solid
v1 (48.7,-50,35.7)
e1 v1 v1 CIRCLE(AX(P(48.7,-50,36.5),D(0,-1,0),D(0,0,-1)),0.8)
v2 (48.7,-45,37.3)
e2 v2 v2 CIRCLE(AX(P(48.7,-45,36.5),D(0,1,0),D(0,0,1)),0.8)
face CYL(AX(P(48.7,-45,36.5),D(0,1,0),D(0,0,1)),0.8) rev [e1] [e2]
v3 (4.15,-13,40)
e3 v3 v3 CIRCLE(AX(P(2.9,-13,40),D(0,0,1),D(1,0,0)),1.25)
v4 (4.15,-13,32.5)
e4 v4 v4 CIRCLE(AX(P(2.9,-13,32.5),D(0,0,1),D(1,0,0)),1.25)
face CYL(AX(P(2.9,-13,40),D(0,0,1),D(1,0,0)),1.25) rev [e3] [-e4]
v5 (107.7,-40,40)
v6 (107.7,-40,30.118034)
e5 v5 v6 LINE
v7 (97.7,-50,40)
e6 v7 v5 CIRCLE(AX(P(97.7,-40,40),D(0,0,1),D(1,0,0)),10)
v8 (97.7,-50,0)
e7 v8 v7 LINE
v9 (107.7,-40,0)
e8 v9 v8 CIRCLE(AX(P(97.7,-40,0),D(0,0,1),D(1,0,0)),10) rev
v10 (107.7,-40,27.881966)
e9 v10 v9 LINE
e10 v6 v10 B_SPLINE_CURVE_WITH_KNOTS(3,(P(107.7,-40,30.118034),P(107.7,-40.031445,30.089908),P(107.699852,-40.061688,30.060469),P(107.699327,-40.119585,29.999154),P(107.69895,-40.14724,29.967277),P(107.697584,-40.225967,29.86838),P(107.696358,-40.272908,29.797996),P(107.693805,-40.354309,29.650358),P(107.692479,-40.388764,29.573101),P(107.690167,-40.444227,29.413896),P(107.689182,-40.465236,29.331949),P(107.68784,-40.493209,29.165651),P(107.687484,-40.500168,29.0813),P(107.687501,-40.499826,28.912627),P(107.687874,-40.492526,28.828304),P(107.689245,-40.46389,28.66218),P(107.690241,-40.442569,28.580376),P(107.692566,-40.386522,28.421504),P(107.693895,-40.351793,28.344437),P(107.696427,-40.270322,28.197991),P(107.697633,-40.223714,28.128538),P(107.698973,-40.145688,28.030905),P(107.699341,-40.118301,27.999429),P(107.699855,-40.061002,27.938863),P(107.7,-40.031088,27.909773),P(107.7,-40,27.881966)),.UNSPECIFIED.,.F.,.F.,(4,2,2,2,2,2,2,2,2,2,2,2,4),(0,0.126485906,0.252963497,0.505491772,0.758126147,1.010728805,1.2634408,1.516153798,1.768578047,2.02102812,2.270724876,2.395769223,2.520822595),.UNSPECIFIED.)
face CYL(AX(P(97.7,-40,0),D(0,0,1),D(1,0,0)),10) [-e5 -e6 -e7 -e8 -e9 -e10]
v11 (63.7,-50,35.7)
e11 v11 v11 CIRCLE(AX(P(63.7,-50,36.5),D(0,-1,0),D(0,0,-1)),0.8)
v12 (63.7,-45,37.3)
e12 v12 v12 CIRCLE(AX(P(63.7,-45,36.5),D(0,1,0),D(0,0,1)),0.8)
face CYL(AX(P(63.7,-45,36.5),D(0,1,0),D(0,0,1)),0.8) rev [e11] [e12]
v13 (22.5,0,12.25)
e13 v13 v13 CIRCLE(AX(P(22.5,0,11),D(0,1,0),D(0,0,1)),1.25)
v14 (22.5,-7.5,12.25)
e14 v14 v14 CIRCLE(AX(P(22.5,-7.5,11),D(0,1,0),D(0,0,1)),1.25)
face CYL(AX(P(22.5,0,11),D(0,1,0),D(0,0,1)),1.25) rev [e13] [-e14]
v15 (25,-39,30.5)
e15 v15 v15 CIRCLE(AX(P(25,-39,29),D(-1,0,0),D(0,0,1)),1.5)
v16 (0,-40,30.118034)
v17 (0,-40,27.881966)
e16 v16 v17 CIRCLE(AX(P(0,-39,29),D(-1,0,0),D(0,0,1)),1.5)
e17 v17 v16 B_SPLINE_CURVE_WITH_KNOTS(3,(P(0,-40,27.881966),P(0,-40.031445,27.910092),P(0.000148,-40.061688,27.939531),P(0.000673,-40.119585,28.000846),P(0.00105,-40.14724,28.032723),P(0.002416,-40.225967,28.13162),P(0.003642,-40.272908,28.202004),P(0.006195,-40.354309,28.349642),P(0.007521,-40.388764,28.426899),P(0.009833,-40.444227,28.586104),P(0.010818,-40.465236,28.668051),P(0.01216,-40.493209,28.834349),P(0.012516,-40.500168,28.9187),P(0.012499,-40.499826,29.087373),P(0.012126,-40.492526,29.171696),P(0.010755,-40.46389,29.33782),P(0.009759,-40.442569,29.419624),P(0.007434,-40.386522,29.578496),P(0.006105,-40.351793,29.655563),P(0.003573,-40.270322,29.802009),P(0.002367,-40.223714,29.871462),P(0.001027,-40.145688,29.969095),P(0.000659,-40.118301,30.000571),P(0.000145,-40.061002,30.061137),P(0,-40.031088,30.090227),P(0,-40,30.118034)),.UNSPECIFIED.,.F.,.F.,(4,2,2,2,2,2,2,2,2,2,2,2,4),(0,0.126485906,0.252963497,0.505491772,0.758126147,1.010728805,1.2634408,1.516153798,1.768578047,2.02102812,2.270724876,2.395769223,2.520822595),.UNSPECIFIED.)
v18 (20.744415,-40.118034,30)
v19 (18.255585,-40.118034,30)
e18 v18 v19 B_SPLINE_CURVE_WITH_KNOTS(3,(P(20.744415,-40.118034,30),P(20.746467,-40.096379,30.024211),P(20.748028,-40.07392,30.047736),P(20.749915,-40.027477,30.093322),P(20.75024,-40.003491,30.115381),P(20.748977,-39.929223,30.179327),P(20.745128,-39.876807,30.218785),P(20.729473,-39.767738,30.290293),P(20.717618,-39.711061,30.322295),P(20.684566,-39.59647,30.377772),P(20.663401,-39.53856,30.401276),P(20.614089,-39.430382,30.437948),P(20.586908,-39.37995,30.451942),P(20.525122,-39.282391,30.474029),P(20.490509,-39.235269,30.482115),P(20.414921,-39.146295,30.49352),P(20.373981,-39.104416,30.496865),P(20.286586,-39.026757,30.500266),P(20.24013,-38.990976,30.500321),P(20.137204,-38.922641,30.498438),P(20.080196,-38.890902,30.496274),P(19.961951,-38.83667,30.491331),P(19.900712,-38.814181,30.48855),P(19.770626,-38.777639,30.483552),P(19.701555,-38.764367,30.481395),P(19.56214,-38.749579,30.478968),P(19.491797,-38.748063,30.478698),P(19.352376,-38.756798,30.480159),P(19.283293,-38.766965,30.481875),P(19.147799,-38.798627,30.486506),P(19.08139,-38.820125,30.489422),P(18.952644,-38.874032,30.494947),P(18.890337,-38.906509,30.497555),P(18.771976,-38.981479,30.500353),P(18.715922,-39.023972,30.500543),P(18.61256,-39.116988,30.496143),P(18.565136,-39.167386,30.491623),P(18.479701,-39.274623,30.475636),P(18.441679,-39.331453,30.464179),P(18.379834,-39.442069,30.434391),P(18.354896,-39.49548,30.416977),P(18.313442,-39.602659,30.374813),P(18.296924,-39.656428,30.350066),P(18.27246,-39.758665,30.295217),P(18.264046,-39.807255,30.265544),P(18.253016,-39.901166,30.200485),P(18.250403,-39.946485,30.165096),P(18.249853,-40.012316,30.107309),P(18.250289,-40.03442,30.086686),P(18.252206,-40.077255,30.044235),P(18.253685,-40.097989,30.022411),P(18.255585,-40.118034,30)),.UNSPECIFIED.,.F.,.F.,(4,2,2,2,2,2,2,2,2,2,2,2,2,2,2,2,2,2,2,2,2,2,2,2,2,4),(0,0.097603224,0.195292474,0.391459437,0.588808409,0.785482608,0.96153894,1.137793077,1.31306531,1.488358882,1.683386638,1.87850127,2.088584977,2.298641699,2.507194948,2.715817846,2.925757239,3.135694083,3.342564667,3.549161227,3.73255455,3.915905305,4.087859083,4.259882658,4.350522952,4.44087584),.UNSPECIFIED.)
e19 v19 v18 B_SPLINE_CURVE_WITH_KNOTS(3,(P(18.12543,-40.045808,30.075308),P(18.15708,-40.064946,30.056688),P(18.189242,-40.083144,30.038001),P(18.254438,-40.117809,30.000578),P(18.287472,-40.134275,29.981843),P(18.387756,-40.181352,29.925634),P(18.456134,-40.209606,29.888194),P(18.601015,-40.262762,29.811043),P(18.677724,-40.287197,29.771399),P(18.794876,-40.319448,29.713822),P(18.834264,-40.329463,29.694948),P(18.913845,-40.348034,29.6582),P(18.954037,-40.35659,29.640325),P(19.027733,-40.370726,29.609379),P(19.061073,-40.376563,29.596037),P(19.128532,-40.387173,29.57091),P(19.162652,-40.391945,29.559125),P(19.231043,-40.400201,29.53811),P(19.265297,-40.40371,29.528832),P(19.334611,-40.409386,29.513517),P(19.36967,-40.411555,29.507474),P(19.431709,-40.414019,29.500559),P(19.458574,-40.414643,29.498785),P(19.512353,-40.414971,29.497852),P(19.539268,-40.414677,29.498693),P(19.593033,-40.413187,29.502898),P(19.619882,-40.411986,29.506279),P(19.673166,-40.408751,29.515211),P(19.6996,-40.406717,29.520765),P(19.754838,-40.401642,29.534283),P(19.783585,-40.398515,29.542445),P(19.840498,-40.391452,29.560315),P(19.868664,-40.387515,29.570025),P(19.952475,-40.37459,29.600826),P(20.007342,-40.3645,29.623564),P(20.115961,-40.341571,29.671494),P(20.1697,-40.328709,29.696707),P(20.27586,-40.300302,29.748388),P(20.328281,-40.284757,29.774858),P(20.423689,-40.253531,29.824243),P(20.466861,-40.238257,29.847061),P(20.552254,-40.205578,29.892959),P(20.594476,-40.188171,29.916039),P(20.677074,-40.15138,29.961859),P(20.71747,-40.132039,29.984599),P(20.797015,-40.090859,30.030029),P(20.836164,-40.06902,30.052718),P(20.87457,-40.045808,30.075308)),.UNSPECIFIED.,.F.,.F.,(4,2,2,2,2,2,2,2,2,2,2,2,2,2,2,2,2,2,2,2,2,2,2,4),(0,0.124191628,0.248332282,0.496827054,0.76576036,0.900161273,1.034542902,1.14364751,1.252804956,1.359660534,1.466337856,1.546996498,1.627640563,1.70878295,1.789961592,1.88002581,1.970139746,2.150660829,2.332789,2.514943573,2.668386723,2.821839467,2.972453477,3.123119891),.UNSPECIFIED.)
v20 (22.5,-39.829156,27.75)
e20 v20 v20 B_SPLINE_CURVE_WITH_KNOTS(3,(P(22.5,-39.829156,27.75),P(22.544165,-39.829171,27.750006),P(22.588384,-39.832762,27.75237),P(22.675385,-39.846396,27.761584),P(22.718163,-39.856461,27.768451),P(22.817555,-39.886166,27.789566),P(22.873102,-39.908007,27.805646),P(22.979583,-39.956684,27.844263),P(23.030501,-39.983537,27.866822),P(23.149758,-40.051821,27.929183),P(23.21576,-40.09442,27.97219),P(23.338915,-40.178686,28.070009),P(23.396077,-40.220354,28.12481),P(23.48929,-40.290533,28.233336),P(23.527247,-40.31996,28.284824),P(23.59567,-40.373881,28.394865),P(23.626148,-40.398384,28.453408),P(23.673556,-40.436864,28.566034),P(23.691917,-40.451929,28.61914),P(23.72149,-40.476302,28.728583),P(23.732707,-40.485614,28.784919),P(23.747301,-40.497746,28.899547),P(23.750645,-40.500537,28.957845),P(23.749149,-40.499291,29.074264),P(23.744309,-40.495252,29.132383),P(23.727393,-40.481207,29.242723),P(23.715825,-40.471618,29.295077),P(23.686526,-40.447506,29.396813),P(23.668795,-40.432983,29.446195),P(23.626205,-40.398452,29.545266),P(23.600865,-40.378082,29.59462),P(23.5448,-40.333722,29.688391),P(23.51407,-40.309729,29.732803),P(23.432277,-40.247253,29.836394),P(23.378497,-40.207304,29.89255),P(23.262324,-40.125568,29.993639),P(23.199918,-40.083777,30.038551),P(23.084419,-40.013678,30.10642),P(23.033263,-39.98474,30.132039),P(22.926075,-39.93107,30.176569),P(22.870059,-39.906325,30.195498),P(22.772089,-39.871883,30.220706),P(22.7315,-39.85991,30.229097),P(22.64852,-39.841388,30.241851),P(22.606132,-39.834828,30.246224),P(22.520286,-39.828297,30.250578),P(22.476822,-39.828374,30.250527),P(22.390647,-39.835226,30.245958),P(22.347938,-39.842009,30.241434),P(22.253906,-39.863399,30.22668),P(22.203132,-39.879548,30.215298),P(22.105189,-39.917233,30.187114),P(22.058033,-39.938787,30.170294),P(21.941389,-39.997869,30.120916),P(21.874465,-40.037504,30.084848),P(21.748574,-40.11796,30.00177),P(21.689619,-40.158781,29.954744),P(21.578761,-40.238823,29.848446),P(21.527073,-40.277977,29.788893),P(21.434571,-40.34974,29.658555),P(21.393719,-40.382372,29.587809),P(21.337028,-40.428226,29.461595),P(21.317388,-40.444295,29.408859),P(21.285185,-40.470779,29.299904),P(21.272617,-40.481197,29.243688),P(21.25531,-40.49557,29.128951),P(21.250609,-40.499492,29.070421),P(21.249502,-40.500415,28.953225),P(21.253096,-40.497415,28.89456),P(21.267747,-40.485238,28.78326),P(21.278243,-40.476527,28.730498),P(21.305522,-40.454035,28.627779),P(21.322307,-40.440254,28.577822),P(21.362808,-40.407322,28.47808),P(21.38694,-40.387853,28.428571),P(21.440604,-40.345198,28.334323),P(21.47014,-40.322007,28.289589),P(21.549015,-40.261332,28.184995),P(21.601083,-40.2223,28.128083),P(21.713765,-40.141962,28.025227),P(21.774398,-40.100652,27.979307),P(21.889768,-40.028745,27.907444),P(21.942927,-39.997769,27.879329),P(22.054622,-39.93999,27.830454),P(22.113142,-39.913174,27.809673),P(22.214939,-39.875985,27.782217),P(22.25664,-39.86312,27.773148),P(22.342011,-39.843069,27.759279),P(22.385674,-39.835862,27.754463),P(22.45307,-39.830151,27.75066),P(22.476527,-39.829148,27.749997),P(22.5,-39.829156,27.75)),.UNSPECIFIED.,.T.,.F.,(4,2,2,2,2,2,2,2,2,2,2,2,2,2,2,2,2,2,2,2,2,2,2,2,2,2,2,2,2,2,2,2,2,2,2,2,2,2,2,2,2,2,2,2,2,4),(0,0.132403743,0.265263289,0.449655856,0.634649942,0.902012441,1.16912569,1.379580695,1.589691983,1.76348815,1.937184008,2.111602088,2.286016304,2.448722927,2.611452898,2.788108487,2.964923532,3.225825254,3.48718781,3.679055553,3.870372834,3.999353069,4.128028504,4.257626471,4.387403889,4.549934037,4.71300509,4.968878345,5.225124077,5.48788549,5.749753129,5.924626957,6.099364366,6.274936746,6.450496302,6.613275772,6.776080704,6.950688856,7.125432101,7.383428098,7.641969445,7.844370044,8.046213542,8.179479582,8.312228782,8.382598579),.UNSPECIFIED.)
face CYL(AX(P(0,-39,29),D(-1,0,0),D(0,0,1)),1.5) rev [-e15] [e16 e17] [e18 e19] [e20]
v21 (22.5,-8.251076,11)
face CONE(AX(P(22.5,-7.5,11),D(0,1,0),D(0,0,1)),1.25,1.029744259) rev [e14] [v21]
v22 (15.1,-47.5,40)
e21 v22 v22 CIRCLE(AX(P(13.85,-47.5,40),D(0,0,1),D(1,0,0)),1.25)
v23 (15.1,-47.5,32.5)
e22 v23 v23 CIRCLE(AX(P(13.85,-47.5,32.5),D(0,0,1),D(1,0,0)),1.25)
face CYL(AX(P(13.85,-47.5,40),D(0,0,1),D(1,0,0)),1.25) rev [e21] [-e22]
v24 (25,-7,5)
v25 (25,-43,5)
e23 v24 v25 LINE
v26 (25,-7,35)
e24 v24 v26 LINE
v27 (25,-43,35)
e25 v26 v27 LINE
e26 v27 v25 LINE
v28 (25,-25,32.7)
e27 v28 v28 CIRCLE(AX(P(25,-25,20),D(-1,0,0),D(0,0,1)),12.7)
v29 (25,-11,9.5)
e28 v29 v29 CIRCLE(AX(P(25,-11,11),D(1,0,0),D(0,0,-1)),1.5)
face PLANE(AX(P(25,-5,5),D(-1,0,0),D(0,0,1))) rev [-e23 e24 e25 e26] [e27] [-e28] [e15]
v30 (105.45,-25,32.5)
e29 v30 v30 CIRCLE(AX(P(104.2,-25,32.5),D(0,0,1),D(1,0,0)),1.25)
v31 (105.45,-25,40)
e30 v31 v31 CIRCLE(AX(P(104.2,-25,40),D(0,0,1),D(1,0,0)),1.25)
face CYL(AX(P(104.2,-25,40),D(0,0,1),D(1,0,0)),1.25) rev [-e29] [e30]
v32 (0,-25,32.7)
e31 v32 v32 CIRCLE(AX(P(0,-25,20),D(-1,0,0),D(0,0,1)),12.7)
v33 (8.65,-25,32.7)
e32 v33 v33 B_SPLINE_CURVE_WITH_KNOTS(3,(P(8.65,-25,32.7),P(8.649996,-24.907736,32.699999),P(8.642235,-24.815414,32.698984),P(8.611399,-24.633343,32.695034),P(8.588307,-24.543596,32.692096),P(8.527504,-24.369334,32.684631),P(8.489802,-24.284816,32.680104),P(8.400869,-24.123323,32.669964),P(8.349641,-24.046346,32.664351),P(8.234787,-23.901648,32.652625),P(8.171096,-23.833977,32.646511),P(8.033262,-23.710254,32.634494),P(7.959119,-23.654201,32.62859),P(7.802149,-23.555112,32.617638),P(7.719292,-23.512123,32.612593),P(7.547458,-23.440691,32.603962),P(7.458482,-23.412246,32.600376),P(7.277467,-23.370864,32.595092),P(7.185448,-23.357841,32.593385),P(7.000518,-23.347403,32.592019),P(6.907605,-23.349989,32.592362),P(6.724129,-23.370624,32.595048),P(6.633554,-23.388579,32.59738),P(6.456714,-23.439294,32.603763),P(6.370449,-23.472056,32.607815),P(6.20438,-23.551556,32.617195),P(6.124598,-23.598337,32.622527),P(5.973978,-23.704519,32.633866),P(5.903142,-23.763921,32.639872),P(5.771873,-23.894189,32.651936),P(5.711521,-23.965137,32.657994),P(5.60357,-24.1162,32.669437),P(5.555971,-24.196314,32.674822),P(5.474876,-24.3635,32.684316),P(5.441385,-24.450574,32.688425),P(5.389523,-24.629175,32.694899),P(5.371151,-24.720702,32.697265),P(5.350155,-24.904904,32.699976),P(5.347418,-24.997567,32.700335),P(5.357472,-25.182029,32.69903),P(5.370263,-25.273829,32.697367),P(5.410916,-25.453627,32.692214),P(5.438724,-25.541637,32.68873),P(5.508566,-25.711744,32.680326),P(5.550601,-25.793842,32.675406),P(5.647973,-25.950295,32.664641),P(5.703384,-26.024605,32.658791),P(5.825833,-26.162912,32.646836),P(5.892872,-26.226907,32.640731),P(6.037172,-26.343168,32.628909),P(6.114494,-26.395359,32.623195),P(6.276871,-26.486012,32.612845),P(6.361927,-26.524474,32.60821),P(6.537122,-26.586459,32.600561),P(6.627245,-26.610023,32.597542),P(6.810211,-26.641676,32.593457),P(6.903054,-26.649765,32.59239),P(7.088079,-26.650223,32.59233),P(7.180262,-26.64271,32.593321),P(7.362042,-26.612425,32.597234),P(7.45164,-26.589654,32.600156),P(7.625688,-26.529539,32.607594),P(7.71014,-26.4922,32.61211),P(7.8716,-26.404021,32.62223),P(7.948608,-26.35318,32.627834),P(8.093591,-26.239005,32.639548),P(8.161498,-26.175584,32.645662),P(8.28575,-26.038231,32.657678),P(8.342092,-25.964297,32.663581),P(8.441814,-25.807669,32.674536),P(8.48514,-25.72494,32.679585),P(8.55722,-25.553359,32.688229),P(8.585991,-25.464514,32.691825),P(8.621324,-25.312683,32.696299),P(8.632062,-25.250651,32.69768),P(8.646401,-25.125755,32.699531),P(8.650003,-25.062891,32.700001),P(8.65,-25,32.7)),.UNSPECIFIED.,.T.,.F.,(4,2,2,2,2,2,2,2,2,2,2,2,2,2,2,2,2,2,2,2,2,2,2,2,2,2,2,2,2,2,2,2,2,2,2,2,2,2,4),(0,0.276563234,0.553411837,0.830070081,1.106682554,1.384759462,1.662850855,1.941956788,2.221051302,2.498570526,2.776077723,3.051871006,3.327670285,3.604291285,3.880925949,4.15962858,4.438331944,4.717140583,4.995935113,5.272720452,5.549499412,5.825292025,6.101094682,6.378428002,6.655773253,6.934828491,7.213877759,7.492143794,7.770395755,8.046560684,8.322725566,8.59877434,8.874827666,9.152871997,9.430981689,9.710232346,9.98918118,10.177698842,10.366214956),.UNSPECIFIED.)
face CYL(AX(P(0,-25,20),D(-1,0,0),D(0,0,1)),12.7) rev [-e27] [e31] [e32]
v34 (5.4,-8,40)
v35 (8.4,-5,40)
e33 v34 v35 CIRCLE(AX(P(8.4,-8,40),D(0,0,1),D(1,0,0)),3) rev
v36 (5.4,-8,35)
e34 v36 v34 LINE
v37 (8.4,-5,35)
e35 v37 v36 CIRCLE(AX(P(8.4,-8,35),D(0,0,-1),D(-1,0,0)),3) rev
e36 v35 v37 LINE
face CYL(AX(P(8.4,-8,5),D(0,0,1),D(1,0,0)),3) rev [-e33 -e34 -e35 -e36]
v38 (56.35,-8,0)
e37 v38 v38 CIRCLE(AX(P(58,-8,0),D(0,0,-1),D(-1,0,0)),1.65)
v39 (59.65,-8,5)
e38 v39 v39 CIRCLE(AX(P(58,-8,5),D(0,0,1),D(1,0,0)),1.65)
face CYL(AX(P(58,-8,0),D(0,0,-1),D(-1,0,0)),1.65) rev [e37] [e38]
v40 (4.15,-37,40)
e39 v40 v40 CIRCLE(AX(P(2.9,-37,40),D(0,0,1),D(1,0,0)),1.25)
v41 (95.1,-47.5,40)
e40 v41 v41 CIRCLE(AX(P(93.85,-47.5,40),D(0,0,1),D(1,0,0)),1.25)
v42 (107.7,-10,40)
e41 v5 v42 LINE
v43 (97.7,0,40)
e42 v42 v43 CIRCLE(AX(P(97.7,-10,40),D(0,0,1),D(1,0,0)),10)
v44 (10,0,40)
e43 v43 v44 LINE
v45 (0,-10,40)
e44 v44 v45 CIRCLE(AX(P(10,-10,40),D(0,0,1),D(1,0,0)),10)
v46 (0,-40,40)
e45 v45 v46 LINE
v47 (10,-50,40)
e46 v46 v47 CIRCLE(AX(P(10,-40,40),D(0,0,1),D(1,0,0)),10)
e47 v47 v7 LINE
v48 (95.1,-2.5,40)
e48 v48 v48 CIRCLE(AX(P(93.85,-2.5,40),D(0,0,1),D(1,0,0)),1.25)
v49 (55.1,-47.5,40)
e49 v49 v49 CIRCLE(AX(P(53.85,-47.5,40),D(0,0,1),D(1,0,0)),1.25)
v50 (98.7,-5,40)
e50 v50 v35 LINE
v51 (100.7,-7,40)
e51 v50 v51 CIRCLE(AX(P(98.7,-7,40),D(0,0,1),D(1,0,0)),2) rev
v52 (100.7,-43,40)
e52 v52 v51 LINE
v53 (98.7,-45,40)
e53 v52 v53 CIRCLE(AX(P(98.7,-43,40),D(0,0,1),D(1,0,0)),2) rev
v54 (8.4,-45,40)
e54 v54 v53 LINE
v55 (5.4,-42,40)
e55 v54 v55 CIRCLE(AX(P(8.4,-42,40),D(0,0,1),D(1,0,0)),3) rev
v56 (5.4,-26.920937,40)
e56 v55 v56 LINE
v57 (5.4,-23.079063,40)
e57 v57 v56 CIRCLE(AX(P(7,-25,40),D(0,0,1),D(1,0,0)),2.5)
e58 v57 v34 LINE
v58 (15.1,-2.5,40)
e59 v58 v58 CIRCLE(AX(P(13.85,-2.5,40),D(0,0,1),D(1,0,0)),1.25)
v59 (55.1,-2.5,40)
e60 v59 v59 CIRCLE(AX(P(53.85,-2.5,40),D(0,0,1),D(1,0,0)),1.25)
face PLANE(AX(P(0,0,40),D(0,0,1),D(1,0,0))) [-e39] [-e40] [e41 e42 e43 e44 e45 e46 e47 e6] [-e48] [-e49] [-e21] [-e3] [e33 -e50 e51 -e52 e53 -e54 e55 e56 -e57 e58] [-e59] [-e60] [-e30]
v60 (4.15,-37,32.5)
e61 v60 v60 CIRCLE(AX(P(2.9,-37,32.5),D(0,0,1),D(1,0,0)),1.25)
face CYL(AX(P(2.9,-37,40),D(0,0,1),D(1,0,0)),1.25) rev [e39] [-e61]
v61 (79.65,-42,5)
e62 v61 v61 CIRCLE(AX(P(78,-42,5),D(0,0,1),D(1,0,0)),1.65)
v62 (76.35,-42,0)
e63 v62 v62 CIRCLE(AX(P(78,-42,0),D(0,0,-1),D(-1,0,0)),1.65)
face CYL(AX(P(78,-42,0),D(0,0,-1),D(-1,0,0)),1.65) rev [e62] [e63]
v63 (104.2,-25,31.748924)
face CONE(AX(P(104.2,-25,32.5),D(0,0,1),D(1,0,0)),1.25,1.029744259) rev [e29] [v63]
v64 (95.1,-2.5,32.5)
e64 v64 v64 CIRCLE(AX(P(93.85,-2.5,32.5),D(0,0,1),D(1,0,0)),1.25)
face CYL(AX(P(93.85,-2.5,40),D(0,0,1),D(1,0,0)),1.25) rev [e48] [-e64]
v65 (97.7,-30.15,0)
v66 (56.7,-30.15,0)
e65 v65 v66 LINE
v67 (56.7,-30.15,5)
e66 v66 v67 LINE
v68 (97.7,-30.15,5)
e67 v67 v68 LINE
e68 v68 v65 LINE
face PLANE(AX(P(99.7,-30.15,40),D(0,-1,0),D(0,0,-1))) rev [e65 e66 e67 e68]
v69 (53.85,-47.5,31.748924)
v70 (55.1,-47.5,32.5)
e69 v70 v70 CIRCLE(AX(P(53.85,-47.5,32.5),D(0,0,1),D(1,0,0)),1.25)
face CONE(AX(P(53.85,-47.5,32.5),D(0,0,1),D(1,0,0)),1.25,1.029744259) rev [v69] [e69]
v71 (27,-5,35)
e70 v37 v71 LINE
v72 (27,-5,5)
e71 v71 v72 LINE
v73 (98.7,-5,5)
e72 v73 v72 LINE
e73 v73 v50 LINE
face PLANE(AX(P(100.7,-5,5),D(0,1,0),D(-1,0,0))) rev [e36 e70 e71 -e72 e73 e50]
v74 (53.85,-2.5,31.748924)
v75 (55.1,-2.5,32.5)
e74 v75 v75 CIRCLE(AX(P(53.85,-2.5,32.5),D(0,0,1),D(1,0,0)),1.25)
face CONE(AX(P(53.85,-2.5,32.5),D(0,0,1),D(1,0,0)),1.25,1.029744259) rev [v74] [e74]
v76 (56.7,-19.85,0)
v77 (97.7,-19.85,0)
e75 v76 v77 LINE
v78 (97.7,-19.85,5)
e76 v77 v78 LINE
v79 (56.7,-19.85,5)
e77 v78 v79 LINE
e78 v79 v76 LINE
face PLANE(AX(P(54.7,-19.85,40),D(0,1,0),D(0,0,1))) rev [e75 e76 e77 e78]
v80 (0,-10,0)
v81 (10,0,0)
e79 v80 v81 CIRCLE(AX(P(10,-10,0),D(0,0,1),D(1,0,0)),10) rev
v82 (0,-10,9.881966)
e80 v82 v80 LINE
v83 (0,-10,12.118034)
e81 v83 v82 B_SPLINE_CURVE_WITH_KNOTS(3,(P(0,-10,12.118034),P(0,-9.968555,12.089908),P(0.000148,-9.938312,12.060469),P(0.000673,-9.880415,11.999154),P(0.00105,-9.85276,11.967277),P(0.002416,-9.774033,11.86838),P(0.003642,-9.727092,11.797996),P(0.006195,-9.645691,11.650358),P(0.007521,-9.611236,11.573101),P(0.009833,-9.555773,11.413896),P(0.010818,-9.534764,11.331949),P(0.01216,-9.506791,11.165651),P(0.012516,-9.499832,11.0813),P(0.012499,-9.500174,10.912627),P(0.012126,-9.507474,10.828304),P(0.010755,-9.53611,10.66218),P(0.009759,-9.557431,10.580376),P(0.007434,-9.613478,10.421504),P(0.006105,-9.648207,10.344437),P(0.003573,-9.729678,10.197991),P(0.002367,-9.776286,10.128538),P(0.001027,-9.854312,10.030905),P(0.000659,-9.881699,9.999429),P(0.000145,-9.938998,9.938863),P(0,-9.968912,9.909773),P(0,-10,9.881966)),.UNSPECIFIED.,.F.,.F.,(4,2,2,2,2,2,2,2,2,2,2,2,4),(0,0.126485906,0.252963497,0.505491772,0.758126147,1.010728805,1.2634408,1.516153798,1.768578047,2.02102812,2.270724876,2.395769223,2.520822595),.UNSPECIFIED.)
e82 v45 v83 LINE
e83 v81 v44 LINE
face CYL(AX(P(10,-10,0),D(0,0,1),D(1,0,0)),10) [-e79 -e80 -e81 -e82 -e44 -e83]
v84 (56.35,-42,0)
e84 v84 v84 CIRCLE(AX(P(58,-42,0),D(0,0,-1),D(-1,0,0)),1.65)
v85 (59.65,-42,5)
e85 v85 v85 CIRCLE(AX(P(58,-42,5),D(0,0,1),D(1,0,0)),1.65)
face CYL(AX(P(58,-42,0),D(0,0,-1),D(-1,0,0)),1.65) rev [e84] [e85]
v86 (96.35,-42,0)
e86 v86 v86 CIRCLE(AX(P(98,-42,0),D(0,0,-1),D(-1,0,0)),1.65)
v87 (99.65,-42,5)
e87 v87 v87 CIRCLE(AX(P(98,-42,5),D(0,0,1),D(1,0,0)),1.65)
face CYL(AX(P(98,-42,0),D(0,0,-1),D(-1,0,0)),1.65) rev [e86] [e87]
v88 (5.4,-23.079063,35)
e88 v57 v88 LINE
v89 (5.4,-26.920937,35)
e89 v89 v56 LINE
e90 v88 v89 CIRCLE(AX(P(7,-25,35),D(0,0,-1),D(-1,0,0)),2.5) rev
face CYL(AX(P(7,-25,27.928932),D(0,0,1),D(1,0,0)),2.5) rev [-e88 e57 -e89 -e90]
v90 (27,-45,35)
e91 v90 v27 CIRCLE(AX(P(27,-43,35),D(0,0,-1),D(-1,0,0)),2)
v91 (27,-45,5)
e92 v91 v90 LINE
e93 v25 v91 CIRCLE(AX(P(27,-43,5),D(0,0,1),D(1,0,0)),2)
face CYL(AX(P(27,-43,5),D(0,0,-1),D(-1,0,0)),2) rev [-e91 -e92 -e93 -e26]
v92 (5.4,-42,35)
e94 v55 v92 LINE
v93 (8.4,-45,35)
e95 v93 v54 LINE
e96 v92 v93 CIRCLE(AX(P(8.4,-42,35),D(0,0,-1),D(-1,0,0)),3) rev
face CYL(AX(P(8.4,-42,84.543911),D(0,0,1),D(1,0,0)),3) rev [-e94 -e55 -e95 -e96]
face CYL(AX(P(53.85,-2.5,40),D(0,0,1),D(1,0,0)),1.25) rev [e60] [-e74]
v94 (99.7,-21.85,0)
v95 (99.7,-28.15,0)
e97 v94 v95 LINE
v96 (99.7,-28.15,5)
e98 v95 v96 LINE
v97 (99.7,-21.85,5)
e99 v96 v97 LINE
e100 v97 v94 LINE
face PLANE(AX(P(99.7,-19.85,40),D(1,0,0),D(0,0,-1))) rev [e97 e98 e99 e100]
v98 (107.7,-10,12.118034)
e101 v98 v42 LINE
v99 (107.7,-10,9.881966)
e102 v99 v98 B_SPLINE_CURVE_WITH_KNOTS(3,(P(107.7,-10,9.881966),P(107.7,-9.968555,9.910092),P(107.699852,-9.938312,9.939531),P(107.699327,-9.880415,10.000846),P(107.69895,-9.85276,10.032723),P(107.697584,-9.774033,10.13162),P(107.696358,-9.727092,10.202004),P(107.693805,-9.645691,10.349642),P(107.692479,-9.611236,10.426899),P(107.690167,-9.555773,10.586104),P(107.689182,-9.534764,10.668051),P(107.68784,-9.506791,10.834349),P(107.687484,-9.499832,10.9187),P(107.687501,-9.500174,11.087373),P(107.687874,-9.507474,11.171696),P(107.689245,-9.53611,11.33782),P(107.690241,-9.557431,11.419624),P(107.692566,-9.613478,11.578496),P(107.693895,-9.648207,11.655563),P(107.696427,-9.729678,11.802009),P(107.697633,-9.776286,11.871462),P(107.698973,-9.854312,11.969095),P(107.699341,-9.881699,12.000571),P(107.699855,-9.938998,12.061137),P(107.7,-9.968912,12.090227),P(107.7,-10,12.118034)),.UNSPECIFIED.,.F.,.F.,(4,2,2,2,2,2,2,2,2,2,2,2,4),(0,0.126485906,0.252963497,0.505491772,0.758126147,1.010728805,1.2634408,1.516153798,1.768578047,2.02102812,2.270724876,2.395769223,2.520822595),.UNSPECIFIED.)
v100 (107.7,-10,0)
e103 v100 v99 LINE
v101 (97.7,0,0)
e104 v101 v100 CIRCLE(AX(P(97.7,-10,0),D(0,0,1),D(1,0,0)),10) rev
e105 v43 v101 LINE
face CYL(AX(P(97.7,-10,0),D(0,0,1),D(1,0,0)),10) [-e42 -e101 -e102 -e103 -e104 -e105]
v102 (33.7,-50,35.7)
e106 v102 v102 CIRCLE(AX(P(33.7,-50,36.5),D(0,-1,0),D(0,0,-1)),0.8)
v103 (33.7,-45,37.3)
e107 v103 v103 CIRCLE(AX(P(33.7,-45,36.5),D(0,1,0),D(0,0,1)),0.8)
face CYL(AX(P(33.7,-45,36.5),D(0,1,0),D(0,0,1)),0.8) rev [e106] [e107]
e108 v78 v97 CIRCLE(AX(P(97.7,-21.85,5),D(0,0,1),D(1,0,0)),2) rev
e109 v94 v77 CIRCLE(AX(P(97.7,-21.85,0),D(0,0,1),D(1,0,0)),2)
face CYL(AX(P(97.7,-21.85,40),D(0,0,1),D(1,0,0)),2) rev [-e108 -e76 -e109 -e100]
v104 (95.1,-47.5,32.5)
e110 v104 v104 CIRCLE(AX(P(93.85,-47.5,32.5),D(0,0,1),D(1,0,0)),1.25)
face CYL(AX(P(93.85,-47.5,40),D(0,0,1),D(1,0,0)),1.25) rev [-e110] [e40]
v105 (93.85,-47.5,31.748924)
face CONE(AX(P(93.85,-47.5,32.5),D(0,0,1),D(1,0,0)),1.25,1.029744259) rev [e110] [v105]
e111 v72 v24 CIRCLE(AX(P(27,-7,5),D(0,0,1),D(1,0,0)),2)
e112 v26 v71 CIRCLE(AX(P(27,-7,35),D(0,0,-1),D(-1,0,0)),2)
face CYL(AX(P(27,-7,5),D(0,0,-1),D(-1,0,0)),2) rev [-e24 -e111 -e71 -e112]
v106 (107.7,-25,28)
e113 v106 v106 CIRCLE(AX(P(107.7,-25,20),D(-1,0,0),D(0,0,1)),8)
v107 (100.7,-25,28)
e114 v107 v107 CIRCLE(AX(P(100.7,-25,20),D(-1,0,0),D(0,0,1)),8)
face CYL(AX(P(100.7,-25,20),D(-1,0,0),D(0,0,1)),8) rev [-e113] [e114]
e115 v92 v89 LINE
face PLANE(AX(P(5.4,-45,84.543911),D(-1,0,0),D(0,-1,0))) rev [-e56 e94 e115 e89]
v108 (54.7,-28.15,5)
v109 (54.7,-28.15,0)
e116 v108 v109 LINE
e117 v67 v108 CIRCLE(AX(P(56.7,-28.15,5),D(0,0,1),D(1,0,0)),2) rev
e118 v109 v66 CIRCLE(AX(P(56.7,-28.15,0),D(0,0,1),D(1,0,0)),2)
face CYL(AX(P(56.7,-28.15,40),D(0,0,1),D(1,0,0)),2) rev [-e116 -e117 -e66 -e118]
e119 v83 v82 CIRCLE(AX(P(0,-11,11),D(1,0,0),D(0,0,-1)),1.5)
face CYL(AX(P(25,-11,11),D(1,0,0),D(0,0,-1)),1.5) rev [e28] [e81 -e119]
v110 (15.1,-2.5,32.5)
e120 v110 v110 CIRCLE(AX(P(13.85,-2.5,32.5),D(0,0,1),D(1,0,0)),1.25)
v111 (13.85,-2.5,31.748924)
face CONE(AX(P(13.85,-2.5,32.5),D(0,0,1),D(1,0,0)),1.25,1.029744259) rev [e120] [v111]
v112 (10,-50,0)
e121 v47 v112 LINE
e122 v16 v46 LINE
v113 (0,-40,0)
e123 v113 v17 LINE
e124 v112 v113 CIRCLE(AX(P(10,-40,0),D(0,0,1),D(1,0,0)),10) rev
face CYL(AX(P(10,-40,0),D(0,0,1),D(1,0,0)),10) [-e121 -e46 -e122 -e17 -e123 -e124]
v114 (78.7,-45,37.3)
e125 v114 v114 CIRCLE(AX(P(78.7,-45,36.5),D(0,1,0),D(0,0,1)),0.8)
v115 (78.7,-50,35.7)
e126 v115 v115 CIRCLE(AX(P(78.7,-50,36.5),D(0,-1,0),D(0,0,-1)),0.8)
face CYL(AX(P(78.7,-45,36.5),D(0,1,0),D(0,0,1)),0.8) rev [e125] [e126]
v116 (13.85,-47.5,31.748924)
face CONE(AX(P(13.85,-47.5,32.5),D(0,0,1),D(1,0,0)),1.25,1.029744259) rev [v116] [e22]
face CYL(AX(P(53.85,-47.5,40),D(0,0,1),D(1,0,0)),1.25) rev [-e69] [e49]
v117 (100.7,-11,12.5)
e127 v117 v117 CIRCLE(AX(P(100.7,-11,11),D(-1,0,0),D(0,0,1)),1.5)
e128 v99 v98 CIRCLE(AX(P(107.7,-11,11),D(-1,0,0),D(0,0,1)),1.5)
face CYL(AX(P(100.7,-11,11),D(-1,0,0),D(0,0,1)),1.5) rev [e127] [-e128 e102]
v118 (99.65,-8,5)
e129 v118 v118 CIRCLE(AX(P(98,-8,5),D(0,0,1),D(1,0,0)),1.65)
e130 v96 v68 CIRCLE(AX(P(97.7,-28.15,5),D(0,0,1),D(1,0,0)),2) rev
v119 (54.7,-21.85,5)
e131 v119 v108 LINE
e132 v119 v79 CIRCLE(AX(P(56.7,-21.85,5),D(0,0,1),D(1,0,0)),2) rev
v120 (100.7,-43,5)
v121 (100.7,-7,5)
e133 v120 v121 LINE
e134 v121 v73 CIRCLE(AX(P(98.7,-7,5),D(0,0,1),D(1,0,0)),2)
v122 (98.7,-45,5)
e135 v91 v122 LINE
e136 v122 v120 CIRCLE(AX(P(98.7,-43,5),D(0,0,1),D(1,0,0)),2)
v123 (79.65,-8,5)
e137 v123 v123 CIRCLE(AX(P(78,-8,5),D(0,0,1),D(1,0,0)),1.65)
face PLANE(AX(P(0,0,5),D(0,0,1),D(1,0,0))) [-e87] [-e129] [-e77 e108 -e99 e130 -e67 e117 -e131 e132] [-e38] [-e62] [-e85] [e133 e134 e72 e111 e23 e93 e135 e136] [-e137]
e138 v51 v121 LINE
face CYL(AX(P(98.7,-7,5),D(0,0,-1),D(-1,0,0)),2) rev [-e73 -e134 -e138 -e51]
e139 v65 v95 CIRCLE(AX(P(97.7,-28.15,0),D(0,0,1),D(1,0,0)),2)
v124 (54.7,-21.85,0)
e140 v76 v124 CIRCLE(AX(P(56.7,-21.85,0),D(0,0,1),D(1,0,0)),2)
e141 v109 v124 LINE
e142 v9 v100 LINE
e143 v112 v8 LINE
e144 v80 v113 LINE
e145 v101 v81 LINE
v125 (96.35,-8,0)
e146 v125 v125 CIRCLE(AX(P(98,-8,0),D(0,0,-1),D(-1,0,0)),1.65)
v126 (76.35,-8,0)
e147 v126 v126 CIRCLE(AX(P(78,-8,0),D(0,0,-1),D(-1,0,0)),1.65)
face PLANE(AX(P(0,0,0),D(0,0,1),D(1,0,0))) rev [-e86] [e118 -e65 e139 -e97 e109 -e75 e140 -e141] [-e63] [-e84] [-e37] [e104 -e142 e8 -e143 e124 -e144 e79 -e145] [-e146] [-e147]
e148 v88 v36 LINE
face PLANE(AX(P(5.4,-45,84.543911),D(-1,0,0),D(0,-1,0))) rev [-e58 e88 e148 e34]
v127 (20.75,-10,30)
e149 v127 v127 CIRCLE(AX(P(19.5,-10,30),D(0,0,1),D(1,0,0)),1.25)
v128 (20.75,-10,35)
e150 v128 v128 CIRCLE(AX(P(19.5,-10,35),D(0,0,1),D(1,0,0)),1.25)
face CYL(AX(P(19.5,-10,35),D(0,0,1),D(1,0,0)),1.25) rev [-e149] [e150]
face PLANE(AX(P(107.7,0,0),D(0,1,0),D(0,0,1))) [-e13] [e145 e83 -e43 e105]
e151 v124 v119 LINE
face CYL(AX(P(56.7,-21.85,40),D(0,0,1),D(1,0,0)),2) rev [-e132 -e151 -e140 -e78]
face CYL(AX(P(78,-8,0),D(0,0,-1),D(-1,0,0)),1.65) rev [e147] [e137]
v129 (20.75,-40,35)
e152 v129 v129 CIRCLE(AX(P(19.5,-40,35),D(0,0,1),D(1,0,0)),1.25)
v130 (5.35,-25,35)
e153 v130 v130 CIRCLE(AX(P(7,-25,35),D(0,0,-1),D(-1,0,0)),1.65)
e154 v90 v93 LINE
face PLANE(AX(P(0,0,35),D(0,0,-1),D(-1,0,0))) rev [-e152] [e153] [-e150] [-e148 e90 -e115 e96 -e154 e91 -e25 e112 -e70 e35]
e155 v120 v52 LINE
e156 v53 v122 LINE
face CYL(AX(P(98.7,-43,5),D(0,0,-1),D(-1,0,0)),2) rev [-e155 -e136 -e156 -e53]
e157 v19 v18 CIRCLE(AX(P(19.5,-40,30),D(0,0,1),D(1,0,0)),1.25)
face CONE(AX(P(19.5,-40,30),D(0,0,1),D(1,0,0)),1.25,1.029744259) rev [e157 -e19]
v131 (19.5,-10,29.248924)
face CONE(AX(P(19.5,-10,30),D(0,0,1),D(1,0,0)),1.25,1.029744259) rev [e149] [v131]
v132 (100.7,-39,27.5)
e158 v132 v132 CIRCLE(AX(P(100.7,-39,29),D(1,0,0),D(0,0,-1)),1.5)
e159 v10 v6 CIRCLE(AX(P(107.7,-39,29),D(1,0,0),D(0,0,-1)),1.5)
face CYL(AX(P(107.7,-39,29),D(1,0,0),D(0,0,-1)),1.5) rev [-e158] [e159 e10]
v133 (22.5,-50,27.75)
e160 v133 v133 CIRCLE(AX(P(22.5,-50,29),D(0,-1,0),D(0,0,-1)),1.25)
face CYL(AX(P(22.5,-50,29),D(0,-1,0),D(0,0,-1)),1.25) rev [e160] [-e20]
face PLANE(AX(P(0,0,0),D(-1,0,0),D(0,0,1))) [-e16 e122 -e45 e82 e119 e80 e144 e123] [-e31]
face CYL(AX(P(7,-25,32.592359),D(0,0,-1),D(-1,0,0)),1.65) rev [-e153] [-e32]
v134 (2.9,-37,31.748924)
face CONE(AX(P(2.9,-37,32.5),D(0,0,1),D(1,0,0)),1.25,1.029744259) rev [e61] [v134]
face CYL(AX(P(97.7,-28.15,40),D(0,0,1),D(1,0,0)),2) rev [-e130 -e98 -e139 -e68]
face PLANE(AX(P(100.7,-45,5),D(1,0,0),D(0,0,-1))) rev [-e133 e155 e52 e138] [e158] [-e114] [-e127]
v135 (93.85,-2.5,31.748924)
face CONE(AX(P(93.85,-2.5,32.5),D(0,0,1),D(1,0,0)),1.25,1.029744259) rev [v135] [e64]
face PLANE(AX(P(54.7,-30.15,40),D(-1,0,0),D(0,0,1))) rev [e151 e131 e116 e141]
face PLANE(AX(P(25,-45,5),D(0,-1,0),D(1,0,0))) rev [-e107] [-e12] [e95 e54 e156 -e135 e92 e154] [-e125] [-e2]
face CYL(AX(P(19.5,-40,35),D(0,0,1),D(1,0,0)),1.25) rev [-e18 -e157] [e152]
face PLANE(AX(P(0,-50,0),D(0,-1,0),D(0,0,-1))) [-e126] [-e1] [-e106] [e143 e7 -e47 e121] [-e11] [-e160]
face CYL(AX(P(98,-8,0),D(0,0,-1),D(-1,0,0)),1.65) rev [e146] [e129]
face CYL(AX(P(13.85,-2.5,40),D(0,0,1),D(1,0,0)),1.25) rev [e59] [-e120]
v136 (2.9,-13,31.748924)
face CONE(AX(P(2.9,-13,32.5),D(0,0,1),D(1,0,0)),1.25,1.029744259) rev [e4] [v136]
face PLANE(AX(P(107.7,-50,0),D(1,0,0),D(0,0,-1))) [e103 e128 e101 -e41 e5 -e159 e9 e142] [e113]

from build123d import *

# Parameters (mm, degrees)
SKETCH1_W                  = 107.7
SKETCH1_H                  = 50
BOSS_EXTRUDE1_DEPTH        = 40
SKETCH2_W                  = 75.7
SKETCH2_H                  = 40
CUT_EXTRUDE1_DEPTH         = 35
CUT_EXTRUDE2_REACH         = 125.791
SKETCH4_W                  = 19.6
SKETCH4_H                  = 40
SKETCH5_W                  = 45
SKETCH5_H                  = 10.3
CUT_EXTRUDE3_DEPTH         = 126.296807621
M4X0_7_TAPPED_HOLE1_D      = 3.3
F_3_0MM_DOWEL_HOLE1_D      = 3
F_3_0MM_DOWEL_HOLE1_DEPTH  = 7
F_3_0MM_DOWEL_HOLE2_D      = 3
F_3_0MM_DOWEL_HOLE2_DEPTH  = 7
M3X0_5_TAPPED_HOLE1_D      = 2.5
M3X0_5_TAPPED_HOLE1_DEPTH  = 7.5
M3X0_5_TAPPED_HOLE1_TIP    = 0.751075774
F_3_0MM_DOWEL_HOLE3_D      = 3
HOLE1_D                    = 16
HOLE1_DEPTH                = 7
M3X0_5_TAPPED_HOLE2_D      = 2.5
M3X0_5_TAPPED_HOLE2_DEPTH  = 7.5
M3X0_5_TAPPED_HOLE2_TIP    = 0.751075774
F_3_0MM_DOWEL_HOLE4_D      = 3
M3X0_5_TAPPED_HOLE3_D      = 2.5
M3X0_5_TAPPED_HOLE3_DEPTH  = 7.5
M3X0_5_TAPPED_HOLE3_TIP    = 0.751075774
M3X0_5_TAPPED_HOLE4_REACH  = 127.297
M3X0_5_TAPPED_HOLE4_BORE_R = 1.25
F_1_1_DIAMETER_HOLE1_D     = 25.4
F_1_1_DIAMETER_HOLE1_DEPTH = 25
M4X0_7_TAPPED_HOLE2_D      = 3.3
M4X0_7_TAPPED_HOLE2_DEPTH  = 7.407641206
M3X0_5_TAPPED_HOLE5_D      = 2.5
M3X0_5_TAPPED_HOLE5_DEPTH  = 5
M3X0_5_TAPPED_HOLE5_TIP    = 0.751075774
FILLET1_R                  = 2
FILLET2_R                  = 3
FILLET3_R                  = 10
SKETCH32_R                 = 2.5
CUT_EXTRUDE4_DEPTH         = 5
M2X0_4_TAPPED_HOLE1_D      = 1.6
M2X0_4_TAPPED_HOLE1_DEPTH  = 5.2
M2X0_4_TAPPED_HOLE1_TIP    = 0.480688495


with BuildPart() as part:
    # Sketch1 → Boss-Extrude1 (new body)
    with BuildSketch(Plane.XY.offset(40)):
        with Locations((53.85, -25)):
            Rectangle(SKETCH1_W, SKETCH1_H)
    extrude(amount=-BOSS_EXTRUDE1_DEPTH)

    # Sketch2 → Cut-Extrude1 (cut)
    with BuildSketch(Plane.XY.offset(40)):
        with Locations((62.85, -25)):
            Rectangle(SKETCH2_W, SKETCH2_H)
    extrude(amount=-CUT_EXTRUDE1_DEPTH, mode=Mode.SUBTRACT)

    # Sketch4 → Cut-Extrude2 (cut, up to next)
    with BuildSketch(Plane(origin=(0, 0, 35), x_dir=(-1, 0, 0), z_dir=(0, 0, -1)), mode=Mode.PRIVATE) as cut_extrude2_sk1:
        with Locations((-15.2, -25)):
            Rectangle(SKETCH4_W, SKETCH4_H)
    cut_extrude2_tool1 = extrude(cut_extrude2_sk1.sketch, amount=-CUT_EXTRUDE2_REACH, mode=Mode.PRIVATE) & part.part
    add(cut_extrude2_tool1.solids().sort_by_distance((15.2, -25, 35))[0], mode=Mode.SUBTRACT)

    # Sketch5 → Cut-Extrude3 (cut, through all)
    with BuildSketch(Plane(origin=(0, 0, 0), x_dir=(-1, 0, 0), z_dir=(0, 0, -1))):
        with Locations((-77.2, -25)):
            Rectangle(SKETCH5_W, SKETCH5_H)
    extrude(amount=-CUT_EXTRUDE3_DEPTH, mode=Mode.SUBTRACT)

    # M4x0.7 Tapped Hole1 (through all)
    with Locations(Plane(origin=(0, 0, 0), x_dir=(-1, 0, 0), z_dir=(0, 0, -1))):
        with Locations((-58, -42), (-78, -42), (-98, -42), (-98, -8), (-58, -8), (-78, -8)):
            Hole(M4X0_7_TAPPED_HOLE1_D / 2)

    # Ø3.0mm Dowel Hole1
    with Locations(Plane.ZY.offset(-100.7)):
        with Locations((11, -11)):
            Hole(F_3_0MM_DOWEL_HOLE1_D / 2, depth=F_3_0MM_DOWEL_HOLE1_DEPTH)

    # Ø3.0mm Dowel Hole2
    with Locations(Plane(origin=(107.7, 0, 0), x_dir=(0, 0, -1), z_dir=(1, 0, 0))):
        with Locations((-29, -39)):
            Hole(F_3_0MM_DOWEL_HOLE2_D / 2, depth=F_3_0MM_DOWEL_HOLE2_DEPTH)

    # M3x0.5 Tapped Hole1
    with Locations(Plane(origin=(0, 0, 0), x_dir=(1, 0, 0), z_dir=(0, 1, 0))):
        with Locations((22.5, -11)):
            Hole(M3X0_5_TAPPED_HOLE1_D / 2, depth=M3X0_5_TAPPED_HOLE1_DEPTH)
            with Locations((0, 0, -(M3X0_5_TAPPED_HOLE1_DEPTH + M3X0_5_TAPPED_HOLE1_TIP / 2))):  # 118° drill point
                Cone(0, M3X0_5_TAPPED_HOLE1_D / 2, M3X0_5_TAPPED_HOLE1_TIP, mode=Mode.SUBTRACT)

    # Ø3.0mm Dowel Hole3 (through all)
    with Locations(Plane(origin=(25, 0, 0), x_dir=(0, 0, -1), z_dir=(1, 0, 0))):
        with Locations((-11, -11)):
            Hole(F_3_0MM_DOWEL_HOLE3_D / 2)

    # Hole1
    with Locations(Plane.ZY.offset(-100.7)):
        with Locations((20, -25)):
            Hole(HOLE1_D / 2, depth=HOLE1_DEPTH)

    # M3x0.5 Tapped Hole2
    with Locations(Plane.XY.offset(40)):
        with Locations((104.2, -25)):
            Hole(M3X0_5_TAPPED_HOLE2_D / 2, depth=M3X0_5_TAPPED_HOLE2_DEPTH)
            with Locations((0, 0, -(M3X0_5_TAPPED_HOLE2_DEPTH + M3X0_5_TAPPED_HOLE2_TIP / 2))):  # 118° drill point
                Cone(0, M3X0_5_TAPPED_HOLE2_D / 2, M3X0_5_TAPPED_HOLE2_TIP, mode=Mode.SUBTRACT)

    # Ø3.0mm Dowel Hole4 (through all)
    with Locations(Plane.ZY):
        with Locations((29, -39)):
            Hole(F_3_0MM_DOWEL_HOLE4_D / 2)

    # M3x0.5 Tapped Hole3
    with Locations(Plane.XY.offset(40)):
        with Locations((2.9, -37), (93.85, -2.5), (53.85, -2.5), (13.85, -2.5), (2.9, -13), (13.85, -47.5), (53.85, -47.5), (93.85, -47.5)):
            Hole(M3X0_5_TAPPED_HOLE3_D / 2, depth=M3X0_5_TAPPED_HOLE3_DEPTH)
            with Locations((0, 0, -(M3X0_5_TAPPED_HOLE3_DEPTH + M3X0_5_TAPPED_HOLE3_TIP / 2))):  # 118° drill point
                Cone(0, M3X0_5_TAPPED_HOLE3_D / 2, M3X0_5_TAPPED_HOLE3_TIP, mode=Mode.SUBTRACT)

    # M3x0.5 Tapped Hole4 bore → M3x0.5 Tapped Hole4 (cut, up to next)
    with BuildSketch(Plane(origin=(0, -50, 0), x_dir=(-1, 0, 0), z_dir=(0, -1, 0)), mode=Mode.PRIVATE) as m3x0_5_tapped_hole4_sk1:
        with Locations((-22.5, -29)):
            Circle(M3X0_5_TAPPED_HOLE4_BORE_R)
    m3x0_5_tapped_hole4_tool1 = extrude(m3x0_5_tapped_hole4_sk1.sketch, amount=-M3X0_5_TAPPED_HOLE4_REACH, mode=Mode.PRIVATE) & part.part
    add(m3x0_5_tapped_hole4_tool1.solids().sort_by_distance((22.5, -50, 29))[0], mode=Mode.SUBTRACT)

    # 1 (1) Diameter Hole1
    with Locations(Plane.ZY):
        with Locations((20, -25)):
            Hole(F_1_1_DIAMETER_HOLE1_D / 2, depth=F_1_1_DIAMETER_HOLE1_DEPTH)

    # M4x0.7 Tapped Hole2
    with Locations(Plane(origin=(0, 0, 32.592358794), x_dir=(-1, 0, 0), z_dir=(0, 0, -1))):
        with Locations((-7, -25)):
            Hole(M4X0_7_TAPPED_HOLE2_D / 2, depth=M4X0_7_TAPPED_HOLE2_DEPTH)

    # M3x0.5 Tapped Hole5
    with Locations(Plane.XY.offset(35)):
        with Locations((19.5, -10), (19.5, -40)):
            Hole(M3X0_5_TAPPED_HOLE5_D / 2, depth=M3X0_5_TAPPED_HOLE5_DEPTH)
            with Locations((0, 0, -(M3X0_5_TAPPED_HOLE5_DEPTH + M3X0_5_TAPPED_HOLE5_TIP / 2))):  # 118° drill point
                Cone(0, M3X0_5_TAPPED_HOLE5_D / 2, M3X0_5_TAPPED_HOLE5_TIP, mode=Mode.SUBTRACT)

    # Fillet1
    fillet1_edges = [part.edges().sort_by_distance(p)[0] for p in [
        (100.7, -45, 22.5),
        (25, -45, 20),
        (25, -5, 20),
        (100.7, -5, 22.5),
        (99.7, -30.15, 2.5),
        (99.7, -19.85, 2.5),
        (54.7, -19.85, 2.5),
        (54.7, -30.15, 2.5),
    ]]
    fillet(fillet1_edges, radius=FILLET1_R)

    # Fillet2
    fillet2_edges = [part.edges().sort_by_distance(p)[0] for p in [
        (5.4, -45, 37.5),
        (5.4, -5, 37.5),
    ]]
    fillet(fillet2_edges, radius=FILLET2_R)

    # Fillet3
    # the kernel refuses this fillet: 10 mm, written as the material it takes off along each edge
    with BuildSketch(Plane(origin=(0, 0, 65), x_dir=(0, -1, 0), z_dir=(0, 0, -1)), Plane(origin=(0, -50, 65), x_dir=(1, 0, 0), z_dir=(0, 0, -1))) as fillet3_piece_1:
        with BuildLine():
            CenterArc((FILLET3_R, -FILLET3_R), FILLET3_R, 90, 90)
            Line((0, -FILLET3_R), (0, 0))
            Line((0, 0), (FILLET3_R, 0))
        make_face()
    extrude(amount=90, mode=Mode.SUBTRACT)
    with BuildSketch(Plane(origin=(107.7, 0, 65), x_dir=(0, -1, 0), z_dir=(0, 0, -1)), Plane(origin=(107.7, -50, 65), x_dir=(-1, 0, 0), z_dir=(0, 0, -1))) as fillet3_piece_2:
        with BuildLine():
            CenterArc((FILLET3_R, FILLET3_R), FILLET3_R, 180, 90)
            Line((0, FILLET3_R), (0, 0))
            Line((0, 0), (FILLET3_R, 0))
        make_face()
    extrude(amount=90, mode=Mode.SUBTRACT)

    # Sketch32 → Cut-Extrude4 (cut)
    with BuildSketch(Plane.XY.offset(40)):
        with Locations((7, -25)):
            Circle(SKETCH32_R)
    extrude(amount=-CUT_EXTRUDE4_DEPTH, mode=Mode.SUBTRACT)

    # M2x0.4 Tapped Hole1
    with Locations(Plane(origin=(0, -45, 0), x_dir=(1, 0, 0), z_dir=(0, 1, 0))):
        with Locations((33.7, -36.5), (48.7, -36.5), (63.7, -36.5), (78.7, -36.5)):
            Hole(M2X0_4_TAPPED_HOLE1_D / 2, depth=M2X0_4_TAPPED_HOLE1_DEPTH)
            with Locations((0, 0, -(M2X0_4_TAPPED_HOLE1_DEPTH + M2X0_4_TAPPED_HOLE1_TIP / 2))):  # 118° drill point
                Cone(0, M2X0_4_TAPPED_HOLE1_D / 2, M2X0_4_TAPPED_HOLE1_TIP, mode=Mode.SUBTRACT)


solid = part.part
